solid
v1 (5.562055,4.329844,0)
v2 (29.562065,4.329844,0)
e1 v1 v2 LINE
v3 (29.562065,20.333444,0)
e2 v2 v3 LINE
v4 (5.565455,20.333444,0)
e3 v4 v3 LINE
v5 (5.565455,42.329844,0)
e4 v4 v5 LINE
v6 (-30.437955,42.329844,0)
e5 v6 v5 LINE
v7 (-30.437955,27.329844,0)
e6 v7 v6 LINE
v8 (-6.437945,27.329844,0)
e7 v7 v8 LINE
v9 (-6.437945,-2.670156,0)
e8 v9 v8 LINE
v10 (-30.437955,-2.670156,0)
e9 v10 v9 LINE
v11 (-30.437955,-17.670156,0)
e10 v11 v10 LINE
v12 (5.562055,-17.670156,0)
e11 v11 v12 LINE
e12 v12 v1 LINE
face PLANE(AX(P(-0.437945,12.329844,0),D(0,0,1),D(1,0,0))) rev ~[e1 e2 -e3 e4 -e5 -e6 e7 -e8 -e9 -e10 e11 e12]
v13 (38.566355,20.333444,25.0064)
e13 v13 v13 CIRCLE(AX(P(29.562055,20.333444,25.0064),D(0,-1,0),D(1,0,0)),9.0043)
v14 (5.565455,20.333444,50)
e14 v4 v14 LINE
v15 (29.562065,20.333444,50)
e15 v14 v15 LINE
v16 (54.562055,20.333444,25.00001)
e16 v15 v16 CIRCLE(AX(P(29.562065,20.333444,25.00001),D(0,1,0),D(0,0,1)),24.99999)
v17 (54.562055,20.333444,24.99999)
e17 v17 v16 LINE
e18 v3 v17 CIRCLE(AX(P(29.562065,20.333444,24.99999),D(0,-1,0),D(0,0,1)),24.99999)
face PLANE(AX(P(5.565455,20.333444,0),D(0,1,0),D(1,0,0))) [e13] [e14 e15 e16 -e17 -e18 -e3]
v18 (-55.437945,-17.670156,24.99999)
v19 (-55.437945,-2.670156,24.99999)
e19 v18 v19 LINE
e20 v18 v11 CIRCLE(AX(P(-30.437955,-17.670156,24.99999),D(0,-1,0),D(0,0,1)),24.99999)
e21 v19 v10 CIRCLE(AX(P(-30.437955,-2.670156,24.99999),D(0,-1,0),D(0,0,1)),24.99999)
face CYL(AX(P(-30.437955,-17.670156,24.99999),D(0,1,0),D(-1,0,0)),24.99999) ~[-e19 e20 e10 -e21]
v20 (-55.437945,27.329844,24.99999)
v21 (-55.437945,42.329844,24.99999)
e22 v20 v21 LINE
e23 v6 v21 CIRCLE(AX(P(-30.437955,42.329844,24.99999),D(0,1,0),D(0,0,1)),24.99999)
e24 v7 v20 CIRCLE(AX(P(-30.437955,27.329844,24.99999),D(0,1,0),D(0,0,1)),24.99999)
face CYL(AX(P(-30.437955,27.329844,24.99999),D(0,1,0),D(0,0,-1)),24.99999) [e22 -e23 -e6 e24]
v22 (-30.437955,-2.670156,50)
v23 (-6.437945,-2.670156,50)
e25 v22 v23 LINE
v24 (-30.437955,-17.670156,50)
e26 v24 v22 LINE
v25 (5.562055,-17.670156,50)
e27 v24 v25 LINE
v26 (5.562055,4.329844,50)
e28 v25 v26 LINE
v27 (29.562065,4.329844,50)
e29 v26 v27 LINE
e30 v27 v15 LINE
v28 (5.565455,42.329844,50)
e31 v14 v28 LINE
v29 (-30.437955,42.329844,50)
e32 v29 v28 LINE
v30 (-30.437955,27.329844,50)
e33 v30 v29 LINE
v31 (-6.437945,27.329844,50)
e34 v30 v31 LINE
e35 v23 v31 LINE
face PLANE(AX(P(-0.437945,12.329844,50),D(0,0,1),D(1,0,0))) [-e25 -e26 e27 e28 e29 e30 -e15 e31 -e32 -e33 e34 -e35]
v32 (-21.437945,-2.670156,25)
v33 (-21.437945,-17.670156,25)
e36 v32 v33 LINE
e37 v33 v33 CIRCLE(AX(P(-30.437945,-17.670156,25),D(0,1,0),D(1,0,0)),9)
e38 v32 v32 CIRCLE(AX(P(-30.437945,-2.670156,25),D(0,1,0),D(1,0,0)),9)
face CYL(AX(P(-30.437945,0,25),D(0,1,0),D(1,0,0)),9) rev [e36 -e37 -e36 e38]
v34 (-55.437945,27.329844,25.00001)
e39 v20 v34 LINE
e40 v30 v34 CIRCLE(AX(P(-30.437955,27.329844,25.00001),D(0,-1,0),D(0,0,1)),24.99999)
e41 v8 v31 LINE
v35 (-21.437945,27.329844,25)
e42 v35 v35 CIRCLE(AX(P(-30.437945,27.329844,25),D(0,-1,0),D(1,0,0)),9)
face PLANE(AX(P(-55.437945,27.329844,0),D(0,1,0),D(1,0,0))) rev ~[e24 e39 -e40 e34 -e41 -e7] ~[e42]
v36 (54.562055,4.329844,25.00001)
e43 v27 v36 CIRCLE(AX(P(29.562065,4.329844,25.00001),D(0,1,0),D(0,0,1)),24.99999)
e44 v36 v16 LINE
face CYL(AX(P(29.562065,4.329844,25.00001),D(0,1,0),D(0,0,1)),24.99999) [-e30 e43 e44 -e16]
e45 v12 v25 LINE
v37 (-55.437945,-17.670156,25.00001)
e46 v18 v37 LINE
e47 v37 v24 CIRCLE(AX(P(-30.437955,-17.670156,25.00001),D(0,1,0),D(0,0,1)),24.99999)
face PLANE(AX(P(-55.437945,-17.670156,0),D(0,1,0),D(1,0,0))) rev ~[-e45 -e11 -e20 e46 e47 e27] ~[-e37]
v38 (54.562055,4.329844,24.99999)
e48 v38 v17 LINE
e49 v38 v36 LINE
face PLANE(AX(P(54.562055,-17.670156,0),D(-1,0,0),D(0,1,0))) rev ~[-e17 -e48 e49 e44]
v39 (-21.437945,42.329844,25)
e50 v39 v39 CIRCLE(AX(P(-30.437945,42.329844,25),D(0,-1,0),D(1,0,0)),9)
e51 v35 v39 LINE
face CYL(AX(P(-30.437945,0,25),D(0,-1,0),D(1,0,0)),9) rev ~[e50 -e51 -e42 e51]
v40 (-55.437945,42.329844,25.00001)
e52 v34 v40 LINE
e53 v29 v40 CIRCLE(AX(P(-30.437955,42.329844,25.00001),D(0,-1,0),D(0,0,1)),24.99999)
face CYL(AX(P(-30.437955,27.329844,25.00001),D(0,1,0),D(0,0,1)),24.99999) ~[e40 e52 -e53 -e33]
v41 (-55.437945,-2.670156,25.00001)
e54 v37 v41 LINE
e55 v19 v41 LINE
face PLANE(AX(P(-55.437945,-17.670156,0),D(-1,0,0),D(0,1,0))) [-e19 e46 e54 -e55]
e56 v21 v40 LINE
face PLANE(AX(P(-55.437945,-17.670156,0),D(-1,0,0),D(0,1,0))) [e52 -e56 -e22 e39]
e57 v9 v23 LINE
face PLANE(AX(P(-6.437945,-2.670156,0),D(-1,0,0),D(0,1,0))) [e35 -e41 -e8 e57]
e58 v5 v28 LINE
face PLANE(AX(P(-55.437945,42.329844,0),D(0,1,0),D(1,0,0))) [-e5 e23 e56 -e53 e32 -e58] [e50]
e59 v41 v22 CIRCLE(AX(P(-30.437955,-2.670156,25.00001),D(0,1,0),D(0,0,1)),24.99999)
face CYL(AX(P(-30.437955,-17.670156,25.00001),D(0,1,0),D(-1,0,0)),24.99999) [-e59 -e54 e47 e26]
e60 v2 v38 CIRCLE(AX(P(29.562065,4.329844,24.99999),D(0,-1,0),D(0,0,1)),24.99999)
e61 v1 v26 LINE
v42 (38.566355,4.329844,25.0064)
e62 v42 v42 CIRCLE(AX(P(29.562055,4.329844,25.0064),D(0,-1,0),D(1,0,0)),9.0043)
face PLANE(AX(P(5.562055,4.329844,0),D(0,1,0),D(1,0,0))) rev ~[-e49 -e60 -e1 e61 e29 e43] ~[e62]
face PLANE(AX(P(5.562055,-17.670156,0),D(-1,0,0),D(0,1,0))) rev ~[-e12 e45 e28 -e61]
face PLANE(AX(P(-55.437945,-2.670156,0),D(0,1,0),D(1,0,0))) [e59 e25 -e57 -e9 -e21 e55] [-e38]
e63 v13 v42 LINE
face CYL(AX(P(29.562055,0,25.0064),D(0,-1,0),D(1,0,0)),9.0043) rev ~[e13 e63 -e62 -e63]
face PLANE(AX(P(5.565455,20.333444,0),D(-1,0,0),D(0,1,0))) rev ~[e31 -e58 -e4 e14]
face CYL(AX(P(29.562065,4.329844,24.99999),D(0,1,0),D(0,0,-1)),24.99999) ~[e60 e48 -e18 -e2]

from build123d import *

# Parameters (mm, degrees)
F0_W     = 110
F0_H     = 60
F1_DEPTH = 50
F2_W     = 49
F2_H     = 22
F2_W_2   = 48.9966
F2_H_2   = 21.9964
F2_H_3   = 30
F3_DEPTH = 50
F4_R     = 24.99999
F5_R     = 9
F5_R_2   = 9.0043
F6_DEPTH = 25.07751
F7_DEPTH = 58.2571


# Not quite as in the source:
# - a fillet or chamfer is up to 0.001 mm smaller than in the source, because OpenCascade refuses the exact size


with BuildPart() as f1:
    # F0 (on Top) → F1 (new body)
    with BuildSketch(Plane.XY):
        with Locations((-0.4379451275, 12.3298443558)):
            Rectangle(F0_W, F0_H)
    extrude(amount=F1_DEPTH)

    # F2 (on Top) → F3 (cut)
    with BuildSketch(Plane.XY):
        with Locations((30.0620548725, -6.6701556442)):
            Rectangle(F2_W, F2_H)
        with Locations((30.0637548725, 31.3316443558)):
            Rectangle(F2_W_2, F2_H_2)
        with Locations((-30.9379451275, 12.3298443558)):
            Rectangle(F2_W, F2_H_3)
    extrude(amount=F3_DEPTH, mode=Mode.SUBTRACT)

    # F4 (radius 25 in the source; OpenCascade refuses exactly that, so slightly less here)
    f4_edges = [f1.edges().sort_by_distance(p)[0] for p in [
        (-55.437945, 34.829844, 50),
        (-55.437945, 34.829844, 0),
        (-55.437945, -10.170156, 50),
        (-55.437945, -10.170156, 0),
        (54.562055, 12.331644, 50),
        (54.562055, 12.331644, 0),
    ]]
    fillet(f4_edges, radius=F4_R)

    # F5 (on Front) → F6 (cut, symmetric)
    with BuildSketch(Plane.XZ):
        with Locations((-30.4379451275, 25)):
            Circle(F5_R)
        with Locations((29.5620548725, 25.0064)):
            Circle(F5_R_2)
    extrude(amount=F6_DEPTH, both=True, mode=Mode.SUBTRACT)

    # F5 (on Front) → F7 (cut)
    with BuildSketch(Plane.XZ):
        with Locations((-30.4379451275, 25)):
            Circle(F5_R)
        with Locations((29.5620548725, 25.0064)):
            Circle(F5_R_2)
    extrude(amount=-F7_DEPTH, mode=Mode.SUBTRACT)


solid = f1.part
